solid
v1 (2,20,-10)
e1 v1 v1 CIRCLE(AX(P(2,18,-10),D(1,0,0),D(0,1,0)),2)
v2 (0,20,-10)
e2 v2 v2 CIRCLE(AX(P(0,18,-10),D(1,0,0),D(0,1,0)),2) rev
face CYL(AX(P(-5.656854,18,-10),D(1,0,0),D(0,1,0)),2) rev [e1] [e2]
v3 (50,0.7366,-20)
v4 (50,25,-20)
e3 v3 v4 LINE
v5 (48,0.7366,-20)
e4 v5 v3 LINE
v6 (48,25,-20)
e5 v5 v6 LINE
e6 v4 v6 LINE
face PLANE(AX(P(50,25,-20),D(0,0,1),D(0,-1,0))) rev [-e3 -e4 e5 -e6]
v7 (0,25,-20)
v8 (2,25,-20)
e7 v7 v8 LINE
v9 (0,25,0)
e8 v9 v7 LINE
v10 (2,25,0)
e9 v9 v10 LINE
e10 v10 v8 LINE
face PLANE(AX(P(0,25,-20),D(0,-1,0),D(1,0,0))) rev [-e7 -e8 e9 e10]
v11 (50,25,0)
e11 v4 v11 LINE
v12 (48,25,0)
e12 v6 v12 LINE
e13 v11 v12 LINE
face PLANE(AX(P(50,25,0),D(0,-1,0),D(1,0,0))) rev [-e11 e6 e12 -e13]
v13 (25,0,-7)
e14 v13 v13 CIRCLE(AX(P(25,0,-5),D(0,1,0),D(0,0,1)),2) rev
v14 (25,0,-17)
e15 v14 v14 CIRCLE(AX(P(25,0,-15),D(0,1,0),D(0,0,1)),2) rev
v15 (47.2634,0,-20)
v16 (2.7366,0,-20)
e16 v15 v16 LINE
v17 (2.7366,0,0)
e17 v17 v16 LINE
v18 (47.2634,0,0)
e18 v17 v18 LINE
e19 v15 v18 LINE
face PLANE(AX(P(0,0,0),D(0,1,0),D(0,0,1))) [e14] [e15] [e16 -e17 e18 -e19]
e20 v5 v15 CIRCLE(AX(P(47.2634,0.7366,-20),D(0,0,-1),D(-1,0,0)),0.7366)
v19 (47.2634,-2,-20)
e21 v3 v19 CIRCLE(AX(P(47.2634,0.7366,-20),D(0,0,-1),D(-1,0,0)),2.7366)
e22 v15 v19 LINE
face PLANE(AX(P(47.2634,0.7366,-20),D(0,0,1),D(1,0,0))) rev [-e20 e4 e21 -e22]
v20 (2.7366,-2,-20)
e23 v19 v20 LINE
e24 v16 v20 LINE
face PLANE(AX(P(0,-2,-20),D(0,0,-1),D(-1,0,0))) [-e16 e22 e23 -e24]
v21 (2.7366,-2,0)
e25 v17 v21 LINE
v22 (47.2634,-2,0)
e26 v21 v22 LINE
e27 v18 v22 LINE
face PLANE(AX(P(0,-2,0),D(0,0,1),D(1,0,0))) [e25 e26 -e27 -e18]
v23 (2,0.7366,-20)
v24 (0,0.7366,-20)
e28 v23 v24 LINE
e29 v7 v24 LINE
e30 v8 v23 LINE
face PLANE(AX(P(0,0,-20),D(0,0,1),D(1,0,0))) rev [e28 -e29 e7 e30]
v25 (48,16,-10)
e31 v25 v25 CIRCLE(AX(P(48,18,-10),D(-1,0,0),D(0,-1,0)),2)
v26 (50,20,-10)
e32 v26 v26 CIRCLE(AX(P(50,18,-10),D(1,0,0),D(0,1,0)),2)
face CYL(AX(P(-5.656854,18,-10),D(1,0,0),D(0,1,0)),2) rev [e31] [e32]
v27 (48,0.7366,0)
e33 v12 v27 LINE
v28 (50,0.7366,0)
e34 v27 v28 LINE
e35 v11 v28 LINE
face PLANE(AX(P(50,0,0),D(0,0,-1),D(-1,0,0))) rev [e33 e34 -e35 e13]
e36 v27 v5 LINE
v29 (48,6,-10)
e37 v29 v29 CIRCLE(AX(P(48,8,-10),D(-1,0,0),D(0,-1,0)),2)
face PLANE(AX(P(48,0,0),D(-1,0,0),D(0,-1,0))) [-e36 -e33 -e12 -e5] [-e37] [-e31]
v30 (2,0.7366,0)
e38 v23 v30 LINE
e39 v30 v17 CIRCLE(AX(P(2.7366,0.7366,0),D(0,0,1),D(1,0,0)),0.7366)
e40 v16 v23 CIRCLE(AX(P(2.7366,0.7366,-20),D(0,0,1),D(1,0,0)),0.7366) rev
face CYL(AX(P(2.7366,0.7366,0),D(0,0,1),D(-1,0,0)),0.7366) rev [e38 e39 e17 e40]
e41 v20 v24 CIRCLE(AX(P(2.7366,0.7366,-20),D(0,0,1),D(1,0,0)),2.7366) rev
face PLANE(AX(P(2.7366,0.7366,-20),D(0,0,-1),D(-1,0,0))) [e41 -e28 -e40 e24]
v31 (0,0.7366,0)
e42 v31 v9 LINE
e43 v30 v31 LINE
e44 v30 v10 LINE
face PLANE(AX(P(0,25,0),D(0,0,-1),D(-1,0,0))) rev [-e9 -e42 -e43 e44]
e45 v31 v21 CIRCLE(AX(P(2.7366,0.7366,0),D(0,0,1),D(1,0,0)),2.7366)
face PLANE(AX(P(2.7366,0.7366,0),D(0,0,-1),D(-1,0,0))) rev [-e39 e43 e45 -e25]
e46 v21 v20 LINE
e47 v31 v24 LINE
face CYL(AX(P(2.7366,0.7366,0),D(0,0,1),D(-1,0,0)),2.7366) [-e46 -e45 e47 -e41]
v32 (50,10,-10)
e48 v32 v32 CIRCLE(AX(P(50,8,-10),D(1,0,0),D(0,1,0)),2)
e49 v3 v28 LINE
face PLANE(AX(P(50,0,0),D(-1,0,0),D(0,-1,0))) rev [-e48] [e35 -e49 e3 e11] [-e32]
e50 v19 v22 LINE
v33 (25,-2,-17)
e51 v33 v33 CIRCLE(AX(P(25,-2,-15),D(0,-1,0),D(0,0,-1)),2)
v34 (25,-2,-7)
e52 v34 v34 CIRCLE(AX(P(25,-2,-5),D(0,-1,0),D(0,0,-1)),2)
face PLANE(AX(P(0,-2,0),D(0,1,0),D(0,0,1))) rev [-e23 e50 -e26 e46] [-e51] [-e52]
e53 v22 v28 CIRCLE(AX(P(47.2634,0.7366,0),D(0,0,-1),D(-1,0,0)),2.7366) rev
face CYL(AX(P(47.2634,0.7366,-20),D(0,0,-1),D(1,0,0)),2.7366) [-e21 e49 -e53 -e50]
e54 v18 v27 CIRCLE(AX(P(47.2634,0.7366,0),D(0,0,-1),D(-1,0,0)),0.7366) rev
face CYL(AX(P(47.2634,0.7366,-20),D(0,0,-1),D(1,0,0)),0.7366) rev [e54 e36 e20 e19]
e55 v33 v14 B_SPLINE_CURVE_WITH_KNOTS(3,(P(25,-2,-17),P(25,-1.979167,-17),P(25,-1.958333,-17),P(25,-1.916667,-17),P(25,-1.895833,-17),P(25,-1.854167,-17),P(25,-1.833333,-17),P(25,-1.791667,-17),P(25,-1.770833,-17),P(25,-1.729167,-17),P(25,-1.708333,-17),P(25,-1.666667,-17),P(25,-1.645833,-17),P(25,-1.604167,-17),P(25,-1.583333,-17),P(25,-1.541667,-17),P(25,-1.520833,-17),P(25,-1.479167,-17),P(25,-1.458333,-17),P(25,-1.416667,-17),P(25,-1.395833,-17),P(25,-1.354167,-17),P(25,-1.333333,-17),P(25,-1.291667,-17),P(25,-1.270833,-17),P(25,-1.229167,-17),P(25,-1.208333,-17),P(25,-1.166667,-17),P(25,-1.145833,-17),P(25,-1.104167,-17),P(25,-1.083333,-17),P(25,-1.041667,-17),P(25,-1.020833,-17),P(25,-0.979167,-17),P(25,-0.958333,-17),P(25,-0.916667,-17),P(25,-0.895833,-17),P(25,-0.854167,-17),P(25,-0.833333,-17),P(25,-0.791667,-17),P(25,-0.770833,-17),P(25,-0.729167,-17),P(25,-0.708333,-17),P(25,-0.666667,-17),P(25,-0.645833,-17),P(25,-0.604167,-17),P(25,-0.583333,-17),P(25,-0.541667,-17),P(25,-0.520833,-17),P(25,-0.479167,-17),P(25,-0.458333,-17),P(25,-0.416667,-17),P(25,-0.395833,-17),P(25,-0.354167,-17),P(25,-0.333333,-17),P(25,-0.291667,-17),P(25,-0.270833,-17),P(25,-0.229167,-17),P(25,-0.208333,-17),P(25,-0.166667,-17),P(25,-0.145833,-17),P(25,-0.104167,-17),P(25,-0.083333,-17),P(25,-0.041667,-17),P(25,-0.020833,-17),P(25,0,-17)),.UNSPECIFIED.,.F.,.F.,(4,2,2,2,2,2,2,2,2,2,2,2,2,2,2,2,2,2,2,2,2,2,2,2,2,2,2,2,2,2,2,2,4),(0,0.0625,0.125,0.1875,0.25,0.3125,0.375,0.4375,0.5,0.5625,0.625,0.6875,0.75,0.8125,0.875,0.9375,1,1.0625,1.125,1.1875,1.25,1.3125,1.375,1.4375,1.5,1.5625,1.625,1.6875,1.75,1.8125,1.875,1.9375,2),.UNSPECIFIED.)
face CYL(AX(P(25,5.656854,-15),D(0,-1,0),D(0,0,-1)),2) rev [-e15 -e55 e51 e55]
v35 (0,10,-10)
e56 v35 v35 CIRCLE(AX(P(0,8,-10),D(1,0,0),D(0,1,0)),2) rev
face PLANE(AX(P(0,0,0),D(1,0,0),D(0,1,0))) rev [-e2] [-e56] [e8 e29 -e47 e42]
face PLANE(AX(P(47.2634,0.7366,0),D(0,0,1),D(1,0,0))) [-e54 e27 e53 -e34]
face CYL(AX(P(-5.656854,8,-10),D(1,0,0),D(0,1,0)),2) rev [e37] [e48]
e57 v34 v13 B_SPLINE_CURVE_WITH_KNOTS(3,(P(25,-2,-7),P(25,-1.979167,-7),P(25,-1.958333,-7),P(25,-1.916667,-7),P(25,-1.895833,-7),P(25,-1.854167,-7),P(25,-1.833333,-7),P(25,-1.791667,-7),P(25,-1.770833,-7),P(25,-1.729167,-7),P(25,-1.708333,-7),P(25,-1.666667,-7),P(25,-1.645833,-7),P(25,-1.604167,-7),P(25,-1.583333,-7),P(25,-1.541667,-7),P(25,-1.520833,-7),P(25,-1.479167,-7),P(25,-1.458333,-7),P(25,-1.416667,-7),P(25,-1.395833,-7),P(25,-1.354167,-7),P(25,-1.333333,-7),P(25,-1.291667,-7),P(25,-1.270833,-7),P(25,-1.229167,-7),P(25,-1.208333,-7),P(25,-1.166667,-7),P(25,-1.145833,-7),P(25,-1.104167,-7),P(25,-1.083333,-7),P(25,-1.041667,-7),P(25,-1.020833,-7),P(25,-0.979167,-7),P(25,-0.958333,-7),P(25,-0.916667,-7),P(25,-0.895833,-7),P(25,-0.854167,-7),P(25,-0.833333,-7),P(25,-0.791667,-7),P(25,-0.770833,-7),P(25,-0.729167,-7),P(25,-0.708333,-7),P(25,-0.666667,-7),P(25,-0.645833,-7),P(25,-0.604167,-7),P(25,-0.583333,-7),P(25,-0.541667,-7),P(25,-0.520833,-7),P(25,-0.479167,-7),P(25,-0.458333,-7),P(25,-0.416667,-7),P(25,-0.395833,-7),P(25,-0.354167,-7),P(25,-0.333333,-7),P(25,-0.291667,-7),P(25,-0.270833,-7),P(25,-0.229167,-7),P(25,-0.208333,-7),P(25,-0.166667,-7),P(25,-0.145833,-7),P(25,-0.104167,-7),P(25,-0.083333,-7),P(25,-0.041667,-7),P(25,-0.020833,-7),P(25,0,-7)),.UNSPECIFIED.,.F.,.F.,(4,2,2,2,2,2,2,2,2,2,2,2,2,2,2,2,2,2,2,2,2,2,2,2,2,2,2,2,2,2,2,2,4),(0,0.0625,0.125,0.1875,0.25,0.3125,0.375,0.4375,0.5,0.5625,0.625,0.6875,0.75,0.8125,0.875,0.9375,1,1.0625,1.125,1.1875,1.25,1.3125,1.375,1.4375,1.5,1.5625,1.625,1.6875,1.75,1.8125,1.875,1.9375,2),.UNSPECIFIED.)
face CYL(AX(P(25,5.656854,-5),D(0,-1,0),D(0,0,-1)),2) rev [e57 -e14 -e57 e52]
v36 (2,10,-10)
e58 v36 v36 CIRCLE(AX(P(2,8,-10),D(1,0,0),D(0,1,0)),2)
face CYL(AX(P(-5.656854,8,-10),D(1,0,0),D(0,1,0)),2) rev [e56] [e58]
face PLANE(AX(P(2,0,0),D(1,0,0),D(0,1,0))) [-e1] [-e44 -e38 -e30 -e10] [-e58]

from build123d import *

# Parameters (mm, degrees)
SKETCH_1_W                       = 50
SKETCH_1_H                       = 20
SM_BASE_FLANGE_1_DEPTH           = 2
SM_EDGE_FLANGE_1_STRIP_W         = 9.4732
SM_EDGE_FLANGE_1_STRIP_H         = 2
SM_EDGE_FLANGE_1_STRIP_CUT_DEPTH = 20
SM_EDGE_FLANGE_1_DEPTH           = 20
SM_EDGE_FLANGE_2_STRIP_W         = 9.4732
SM_EDGE_FLANGE_2_STRIP_H         = 2
SM_EDGE_FLANGE_2_STRIP_CUT_DEPTH = 20
SM_EDGE_FLANGE_2_DEPTH           = 20
SKETCH_12_R                      = 2
CUT_EXTRUDE_1_DEPTH              = 2
CUT_EXTRUDE_2_REACH              = 61.372
SKETCH_13_R                      = 2


# Sheet-metal steps are written as plain solids
with BuildPart() as part:
    # Sketch 1 → Базовая кромка1 (new body)
    with BuildSketch(Plane(origin=(0, 0, 0), x_dir=(1, 0, 0), z_dir=(0, 1, 0))):
        with Locations((25, 10)):
            Rectangle(SKETCH_1_W, SKETCH_1_H)
    extrude(amount=-SM_BASE_FLANGE_1_DEPTH)

    # Ребро-кромка1 strip (across the edge) → Ребро-кромка1 strip cut (cut)
    with BuildSketch(Plane(origin=(50, 0, 0), x_dir=(-1, 0, 0), z_dir=(0, 0, -1))):
        with Locations((-2, -1)):
            Rectangle(SM_EDGE_FLANGE_1_STRIP_W, SM_EDGE_FLANGE_1_STRIP_H)
    extrude(amount=SM_EDGE_FLANGE_1_STRIP_CUT_DEPTH, mode=Mode.SUBTRACT)

    # Ребро-кромка1 section (across the edge) → Ребро-кромка1 (add)
    with BuildSketch(Plane(origin=(50, 0, 0), x_dir=(-1, 0, 0), z_dir=(0, 0, -1))):
        with BuildLine():
            Line((0, 0.7366), (0, 25))
            Line((0, 25), (2, 25))
            Line((2, 25), (2, 0.7366))
            ThreePointArc((2, 0.7366), (2.215745145, 0.215745145), (2.7366, 0))
            Line((2.7366, 0), (2.7366, -2))
            ThreePointArc((2.7366, -2), (0.801531583, -1.198468417), (0, 0.7366))
        make_face()
    extrude(amount=SM_EDGE_FLANGE_1_DEPTH)

    # Ребро-кромка2 strip (across the edge) → Ребро-кромка2 strip cut (cut)
    with BuildSketch(Plane.XY.offset(-20)):
        with Locations((-2, -1)):
            Rectangle(SM_EDGE_FLANGE_2_STRIP_W, SM_EDGE_FLANGE_2_STRIP_H)
    extrude(amount=SM_EDGE_FLANGE_2_STRIP_CUT_DEPTH, mode=Mode.SUBTRACT)

    # Ребро-кромка2 section (across the edge) → Ребро-кромка2 (add)
    with BuildSketch(Plane.XY.offset(-20)):
        with BuildLine():
            Line((0, 0.7366), (0, 25))
            Line((0, 25), (2, 25))
            Line((2, 25), (2, 0.7366))
            ThreePointArc((2, 0.7366), (2.215745145, 0.215745145), (2.7366, 0))
            Line((2.7366, 0), (2.7366, -2))
            ThreePointArc((2.7366, -2), (0.801531583, -1.198468417), (0, 0.7366))
        make_face()
    extrude(amount=SM_EDGE_FLANGE_2_DEPTH)

    # Эскиз12 → Вырез-Вытянуть1 (cut)
    with BuildSketch(Plane.XZ.offset(2)):
        with Locations(Location((25, -5, 0), (0, 0, 270))):
            Circle(SKETCH_12_R)
        with Locations(Location((25, -15, 0), (0, 0, 270))):
            Circle(SKETCH_12_R)
    extrude(amount=-CUT_EXTRUDE_1_DEPTH, mode=Mode.SUBTRACT)

    # Вырез-Вытянуть2: up to this face of the body (flat: up to its plane)
    cut_extrude_2_end = Plane(part.part.faces().sort_by_distance((0, 12.8683, -10))[0])
    # Эскиз13 → Вырез-Вытянуть2 (cut, up to the picked face)
    with BuildSketch(Plane(origin=(50, 0, 0), x_dir=(0, 0, -1), z_dir=(1, 0, 0)), mode=Mode.PRIVATE) as cut_extrude_2_sk1:
        with Locations(Location((10, 8, 0), (0, 0, 90))):
            Circle(SKETCH_13_R)
    cut_extrude_2_tool1 = split(extrude(cut_extrude_2_sk1.sketch, amount=-CUT_EXTRUDE_2_REACH, mode=Mode.PRIVATE), bisect_by=cut_extrude_2_end, keep=Keep.BOTH, mode=Mode.PRIVATE)
    # Эскиз13 → Вырез-Вытянуть2 (cut, up to the picked face)
    with BuildSketch(Plane(origin=(50, 0, 0), x_dir=(0, 0, -1), z_dir=(1, 0, 0)), mode=Mode.PRIVATE) as cut_extrude_2_sk2:
        with Locations(Location((10, 18, 0), (0, 0, 90))):
            Circle(SKETCH_13_R)
    cut_extrude_2_tool2 = split(extrude(cut_extrude_2_sk2.sketch, amount=-CUT_EXTRUDE_2_REACH, mode=Mode.PRIVATE), bisect_by=cut_extrude_2_end, keep=Keep.BOTH, mode=Mode.PRIVATE)
    add(cut_extrude_2_tool1.solids().sort_by(Axis((50, 8, -10), (-1, 0, 0)))[0], mode=Mode.SUBTRACT)
    add(cut_extrude_2_tool2.solids().sort_by(Axis((50, 18, -10), (-1, 0, 0)))[0], mode=Mode.SUBTRACT)


solid = part.part
